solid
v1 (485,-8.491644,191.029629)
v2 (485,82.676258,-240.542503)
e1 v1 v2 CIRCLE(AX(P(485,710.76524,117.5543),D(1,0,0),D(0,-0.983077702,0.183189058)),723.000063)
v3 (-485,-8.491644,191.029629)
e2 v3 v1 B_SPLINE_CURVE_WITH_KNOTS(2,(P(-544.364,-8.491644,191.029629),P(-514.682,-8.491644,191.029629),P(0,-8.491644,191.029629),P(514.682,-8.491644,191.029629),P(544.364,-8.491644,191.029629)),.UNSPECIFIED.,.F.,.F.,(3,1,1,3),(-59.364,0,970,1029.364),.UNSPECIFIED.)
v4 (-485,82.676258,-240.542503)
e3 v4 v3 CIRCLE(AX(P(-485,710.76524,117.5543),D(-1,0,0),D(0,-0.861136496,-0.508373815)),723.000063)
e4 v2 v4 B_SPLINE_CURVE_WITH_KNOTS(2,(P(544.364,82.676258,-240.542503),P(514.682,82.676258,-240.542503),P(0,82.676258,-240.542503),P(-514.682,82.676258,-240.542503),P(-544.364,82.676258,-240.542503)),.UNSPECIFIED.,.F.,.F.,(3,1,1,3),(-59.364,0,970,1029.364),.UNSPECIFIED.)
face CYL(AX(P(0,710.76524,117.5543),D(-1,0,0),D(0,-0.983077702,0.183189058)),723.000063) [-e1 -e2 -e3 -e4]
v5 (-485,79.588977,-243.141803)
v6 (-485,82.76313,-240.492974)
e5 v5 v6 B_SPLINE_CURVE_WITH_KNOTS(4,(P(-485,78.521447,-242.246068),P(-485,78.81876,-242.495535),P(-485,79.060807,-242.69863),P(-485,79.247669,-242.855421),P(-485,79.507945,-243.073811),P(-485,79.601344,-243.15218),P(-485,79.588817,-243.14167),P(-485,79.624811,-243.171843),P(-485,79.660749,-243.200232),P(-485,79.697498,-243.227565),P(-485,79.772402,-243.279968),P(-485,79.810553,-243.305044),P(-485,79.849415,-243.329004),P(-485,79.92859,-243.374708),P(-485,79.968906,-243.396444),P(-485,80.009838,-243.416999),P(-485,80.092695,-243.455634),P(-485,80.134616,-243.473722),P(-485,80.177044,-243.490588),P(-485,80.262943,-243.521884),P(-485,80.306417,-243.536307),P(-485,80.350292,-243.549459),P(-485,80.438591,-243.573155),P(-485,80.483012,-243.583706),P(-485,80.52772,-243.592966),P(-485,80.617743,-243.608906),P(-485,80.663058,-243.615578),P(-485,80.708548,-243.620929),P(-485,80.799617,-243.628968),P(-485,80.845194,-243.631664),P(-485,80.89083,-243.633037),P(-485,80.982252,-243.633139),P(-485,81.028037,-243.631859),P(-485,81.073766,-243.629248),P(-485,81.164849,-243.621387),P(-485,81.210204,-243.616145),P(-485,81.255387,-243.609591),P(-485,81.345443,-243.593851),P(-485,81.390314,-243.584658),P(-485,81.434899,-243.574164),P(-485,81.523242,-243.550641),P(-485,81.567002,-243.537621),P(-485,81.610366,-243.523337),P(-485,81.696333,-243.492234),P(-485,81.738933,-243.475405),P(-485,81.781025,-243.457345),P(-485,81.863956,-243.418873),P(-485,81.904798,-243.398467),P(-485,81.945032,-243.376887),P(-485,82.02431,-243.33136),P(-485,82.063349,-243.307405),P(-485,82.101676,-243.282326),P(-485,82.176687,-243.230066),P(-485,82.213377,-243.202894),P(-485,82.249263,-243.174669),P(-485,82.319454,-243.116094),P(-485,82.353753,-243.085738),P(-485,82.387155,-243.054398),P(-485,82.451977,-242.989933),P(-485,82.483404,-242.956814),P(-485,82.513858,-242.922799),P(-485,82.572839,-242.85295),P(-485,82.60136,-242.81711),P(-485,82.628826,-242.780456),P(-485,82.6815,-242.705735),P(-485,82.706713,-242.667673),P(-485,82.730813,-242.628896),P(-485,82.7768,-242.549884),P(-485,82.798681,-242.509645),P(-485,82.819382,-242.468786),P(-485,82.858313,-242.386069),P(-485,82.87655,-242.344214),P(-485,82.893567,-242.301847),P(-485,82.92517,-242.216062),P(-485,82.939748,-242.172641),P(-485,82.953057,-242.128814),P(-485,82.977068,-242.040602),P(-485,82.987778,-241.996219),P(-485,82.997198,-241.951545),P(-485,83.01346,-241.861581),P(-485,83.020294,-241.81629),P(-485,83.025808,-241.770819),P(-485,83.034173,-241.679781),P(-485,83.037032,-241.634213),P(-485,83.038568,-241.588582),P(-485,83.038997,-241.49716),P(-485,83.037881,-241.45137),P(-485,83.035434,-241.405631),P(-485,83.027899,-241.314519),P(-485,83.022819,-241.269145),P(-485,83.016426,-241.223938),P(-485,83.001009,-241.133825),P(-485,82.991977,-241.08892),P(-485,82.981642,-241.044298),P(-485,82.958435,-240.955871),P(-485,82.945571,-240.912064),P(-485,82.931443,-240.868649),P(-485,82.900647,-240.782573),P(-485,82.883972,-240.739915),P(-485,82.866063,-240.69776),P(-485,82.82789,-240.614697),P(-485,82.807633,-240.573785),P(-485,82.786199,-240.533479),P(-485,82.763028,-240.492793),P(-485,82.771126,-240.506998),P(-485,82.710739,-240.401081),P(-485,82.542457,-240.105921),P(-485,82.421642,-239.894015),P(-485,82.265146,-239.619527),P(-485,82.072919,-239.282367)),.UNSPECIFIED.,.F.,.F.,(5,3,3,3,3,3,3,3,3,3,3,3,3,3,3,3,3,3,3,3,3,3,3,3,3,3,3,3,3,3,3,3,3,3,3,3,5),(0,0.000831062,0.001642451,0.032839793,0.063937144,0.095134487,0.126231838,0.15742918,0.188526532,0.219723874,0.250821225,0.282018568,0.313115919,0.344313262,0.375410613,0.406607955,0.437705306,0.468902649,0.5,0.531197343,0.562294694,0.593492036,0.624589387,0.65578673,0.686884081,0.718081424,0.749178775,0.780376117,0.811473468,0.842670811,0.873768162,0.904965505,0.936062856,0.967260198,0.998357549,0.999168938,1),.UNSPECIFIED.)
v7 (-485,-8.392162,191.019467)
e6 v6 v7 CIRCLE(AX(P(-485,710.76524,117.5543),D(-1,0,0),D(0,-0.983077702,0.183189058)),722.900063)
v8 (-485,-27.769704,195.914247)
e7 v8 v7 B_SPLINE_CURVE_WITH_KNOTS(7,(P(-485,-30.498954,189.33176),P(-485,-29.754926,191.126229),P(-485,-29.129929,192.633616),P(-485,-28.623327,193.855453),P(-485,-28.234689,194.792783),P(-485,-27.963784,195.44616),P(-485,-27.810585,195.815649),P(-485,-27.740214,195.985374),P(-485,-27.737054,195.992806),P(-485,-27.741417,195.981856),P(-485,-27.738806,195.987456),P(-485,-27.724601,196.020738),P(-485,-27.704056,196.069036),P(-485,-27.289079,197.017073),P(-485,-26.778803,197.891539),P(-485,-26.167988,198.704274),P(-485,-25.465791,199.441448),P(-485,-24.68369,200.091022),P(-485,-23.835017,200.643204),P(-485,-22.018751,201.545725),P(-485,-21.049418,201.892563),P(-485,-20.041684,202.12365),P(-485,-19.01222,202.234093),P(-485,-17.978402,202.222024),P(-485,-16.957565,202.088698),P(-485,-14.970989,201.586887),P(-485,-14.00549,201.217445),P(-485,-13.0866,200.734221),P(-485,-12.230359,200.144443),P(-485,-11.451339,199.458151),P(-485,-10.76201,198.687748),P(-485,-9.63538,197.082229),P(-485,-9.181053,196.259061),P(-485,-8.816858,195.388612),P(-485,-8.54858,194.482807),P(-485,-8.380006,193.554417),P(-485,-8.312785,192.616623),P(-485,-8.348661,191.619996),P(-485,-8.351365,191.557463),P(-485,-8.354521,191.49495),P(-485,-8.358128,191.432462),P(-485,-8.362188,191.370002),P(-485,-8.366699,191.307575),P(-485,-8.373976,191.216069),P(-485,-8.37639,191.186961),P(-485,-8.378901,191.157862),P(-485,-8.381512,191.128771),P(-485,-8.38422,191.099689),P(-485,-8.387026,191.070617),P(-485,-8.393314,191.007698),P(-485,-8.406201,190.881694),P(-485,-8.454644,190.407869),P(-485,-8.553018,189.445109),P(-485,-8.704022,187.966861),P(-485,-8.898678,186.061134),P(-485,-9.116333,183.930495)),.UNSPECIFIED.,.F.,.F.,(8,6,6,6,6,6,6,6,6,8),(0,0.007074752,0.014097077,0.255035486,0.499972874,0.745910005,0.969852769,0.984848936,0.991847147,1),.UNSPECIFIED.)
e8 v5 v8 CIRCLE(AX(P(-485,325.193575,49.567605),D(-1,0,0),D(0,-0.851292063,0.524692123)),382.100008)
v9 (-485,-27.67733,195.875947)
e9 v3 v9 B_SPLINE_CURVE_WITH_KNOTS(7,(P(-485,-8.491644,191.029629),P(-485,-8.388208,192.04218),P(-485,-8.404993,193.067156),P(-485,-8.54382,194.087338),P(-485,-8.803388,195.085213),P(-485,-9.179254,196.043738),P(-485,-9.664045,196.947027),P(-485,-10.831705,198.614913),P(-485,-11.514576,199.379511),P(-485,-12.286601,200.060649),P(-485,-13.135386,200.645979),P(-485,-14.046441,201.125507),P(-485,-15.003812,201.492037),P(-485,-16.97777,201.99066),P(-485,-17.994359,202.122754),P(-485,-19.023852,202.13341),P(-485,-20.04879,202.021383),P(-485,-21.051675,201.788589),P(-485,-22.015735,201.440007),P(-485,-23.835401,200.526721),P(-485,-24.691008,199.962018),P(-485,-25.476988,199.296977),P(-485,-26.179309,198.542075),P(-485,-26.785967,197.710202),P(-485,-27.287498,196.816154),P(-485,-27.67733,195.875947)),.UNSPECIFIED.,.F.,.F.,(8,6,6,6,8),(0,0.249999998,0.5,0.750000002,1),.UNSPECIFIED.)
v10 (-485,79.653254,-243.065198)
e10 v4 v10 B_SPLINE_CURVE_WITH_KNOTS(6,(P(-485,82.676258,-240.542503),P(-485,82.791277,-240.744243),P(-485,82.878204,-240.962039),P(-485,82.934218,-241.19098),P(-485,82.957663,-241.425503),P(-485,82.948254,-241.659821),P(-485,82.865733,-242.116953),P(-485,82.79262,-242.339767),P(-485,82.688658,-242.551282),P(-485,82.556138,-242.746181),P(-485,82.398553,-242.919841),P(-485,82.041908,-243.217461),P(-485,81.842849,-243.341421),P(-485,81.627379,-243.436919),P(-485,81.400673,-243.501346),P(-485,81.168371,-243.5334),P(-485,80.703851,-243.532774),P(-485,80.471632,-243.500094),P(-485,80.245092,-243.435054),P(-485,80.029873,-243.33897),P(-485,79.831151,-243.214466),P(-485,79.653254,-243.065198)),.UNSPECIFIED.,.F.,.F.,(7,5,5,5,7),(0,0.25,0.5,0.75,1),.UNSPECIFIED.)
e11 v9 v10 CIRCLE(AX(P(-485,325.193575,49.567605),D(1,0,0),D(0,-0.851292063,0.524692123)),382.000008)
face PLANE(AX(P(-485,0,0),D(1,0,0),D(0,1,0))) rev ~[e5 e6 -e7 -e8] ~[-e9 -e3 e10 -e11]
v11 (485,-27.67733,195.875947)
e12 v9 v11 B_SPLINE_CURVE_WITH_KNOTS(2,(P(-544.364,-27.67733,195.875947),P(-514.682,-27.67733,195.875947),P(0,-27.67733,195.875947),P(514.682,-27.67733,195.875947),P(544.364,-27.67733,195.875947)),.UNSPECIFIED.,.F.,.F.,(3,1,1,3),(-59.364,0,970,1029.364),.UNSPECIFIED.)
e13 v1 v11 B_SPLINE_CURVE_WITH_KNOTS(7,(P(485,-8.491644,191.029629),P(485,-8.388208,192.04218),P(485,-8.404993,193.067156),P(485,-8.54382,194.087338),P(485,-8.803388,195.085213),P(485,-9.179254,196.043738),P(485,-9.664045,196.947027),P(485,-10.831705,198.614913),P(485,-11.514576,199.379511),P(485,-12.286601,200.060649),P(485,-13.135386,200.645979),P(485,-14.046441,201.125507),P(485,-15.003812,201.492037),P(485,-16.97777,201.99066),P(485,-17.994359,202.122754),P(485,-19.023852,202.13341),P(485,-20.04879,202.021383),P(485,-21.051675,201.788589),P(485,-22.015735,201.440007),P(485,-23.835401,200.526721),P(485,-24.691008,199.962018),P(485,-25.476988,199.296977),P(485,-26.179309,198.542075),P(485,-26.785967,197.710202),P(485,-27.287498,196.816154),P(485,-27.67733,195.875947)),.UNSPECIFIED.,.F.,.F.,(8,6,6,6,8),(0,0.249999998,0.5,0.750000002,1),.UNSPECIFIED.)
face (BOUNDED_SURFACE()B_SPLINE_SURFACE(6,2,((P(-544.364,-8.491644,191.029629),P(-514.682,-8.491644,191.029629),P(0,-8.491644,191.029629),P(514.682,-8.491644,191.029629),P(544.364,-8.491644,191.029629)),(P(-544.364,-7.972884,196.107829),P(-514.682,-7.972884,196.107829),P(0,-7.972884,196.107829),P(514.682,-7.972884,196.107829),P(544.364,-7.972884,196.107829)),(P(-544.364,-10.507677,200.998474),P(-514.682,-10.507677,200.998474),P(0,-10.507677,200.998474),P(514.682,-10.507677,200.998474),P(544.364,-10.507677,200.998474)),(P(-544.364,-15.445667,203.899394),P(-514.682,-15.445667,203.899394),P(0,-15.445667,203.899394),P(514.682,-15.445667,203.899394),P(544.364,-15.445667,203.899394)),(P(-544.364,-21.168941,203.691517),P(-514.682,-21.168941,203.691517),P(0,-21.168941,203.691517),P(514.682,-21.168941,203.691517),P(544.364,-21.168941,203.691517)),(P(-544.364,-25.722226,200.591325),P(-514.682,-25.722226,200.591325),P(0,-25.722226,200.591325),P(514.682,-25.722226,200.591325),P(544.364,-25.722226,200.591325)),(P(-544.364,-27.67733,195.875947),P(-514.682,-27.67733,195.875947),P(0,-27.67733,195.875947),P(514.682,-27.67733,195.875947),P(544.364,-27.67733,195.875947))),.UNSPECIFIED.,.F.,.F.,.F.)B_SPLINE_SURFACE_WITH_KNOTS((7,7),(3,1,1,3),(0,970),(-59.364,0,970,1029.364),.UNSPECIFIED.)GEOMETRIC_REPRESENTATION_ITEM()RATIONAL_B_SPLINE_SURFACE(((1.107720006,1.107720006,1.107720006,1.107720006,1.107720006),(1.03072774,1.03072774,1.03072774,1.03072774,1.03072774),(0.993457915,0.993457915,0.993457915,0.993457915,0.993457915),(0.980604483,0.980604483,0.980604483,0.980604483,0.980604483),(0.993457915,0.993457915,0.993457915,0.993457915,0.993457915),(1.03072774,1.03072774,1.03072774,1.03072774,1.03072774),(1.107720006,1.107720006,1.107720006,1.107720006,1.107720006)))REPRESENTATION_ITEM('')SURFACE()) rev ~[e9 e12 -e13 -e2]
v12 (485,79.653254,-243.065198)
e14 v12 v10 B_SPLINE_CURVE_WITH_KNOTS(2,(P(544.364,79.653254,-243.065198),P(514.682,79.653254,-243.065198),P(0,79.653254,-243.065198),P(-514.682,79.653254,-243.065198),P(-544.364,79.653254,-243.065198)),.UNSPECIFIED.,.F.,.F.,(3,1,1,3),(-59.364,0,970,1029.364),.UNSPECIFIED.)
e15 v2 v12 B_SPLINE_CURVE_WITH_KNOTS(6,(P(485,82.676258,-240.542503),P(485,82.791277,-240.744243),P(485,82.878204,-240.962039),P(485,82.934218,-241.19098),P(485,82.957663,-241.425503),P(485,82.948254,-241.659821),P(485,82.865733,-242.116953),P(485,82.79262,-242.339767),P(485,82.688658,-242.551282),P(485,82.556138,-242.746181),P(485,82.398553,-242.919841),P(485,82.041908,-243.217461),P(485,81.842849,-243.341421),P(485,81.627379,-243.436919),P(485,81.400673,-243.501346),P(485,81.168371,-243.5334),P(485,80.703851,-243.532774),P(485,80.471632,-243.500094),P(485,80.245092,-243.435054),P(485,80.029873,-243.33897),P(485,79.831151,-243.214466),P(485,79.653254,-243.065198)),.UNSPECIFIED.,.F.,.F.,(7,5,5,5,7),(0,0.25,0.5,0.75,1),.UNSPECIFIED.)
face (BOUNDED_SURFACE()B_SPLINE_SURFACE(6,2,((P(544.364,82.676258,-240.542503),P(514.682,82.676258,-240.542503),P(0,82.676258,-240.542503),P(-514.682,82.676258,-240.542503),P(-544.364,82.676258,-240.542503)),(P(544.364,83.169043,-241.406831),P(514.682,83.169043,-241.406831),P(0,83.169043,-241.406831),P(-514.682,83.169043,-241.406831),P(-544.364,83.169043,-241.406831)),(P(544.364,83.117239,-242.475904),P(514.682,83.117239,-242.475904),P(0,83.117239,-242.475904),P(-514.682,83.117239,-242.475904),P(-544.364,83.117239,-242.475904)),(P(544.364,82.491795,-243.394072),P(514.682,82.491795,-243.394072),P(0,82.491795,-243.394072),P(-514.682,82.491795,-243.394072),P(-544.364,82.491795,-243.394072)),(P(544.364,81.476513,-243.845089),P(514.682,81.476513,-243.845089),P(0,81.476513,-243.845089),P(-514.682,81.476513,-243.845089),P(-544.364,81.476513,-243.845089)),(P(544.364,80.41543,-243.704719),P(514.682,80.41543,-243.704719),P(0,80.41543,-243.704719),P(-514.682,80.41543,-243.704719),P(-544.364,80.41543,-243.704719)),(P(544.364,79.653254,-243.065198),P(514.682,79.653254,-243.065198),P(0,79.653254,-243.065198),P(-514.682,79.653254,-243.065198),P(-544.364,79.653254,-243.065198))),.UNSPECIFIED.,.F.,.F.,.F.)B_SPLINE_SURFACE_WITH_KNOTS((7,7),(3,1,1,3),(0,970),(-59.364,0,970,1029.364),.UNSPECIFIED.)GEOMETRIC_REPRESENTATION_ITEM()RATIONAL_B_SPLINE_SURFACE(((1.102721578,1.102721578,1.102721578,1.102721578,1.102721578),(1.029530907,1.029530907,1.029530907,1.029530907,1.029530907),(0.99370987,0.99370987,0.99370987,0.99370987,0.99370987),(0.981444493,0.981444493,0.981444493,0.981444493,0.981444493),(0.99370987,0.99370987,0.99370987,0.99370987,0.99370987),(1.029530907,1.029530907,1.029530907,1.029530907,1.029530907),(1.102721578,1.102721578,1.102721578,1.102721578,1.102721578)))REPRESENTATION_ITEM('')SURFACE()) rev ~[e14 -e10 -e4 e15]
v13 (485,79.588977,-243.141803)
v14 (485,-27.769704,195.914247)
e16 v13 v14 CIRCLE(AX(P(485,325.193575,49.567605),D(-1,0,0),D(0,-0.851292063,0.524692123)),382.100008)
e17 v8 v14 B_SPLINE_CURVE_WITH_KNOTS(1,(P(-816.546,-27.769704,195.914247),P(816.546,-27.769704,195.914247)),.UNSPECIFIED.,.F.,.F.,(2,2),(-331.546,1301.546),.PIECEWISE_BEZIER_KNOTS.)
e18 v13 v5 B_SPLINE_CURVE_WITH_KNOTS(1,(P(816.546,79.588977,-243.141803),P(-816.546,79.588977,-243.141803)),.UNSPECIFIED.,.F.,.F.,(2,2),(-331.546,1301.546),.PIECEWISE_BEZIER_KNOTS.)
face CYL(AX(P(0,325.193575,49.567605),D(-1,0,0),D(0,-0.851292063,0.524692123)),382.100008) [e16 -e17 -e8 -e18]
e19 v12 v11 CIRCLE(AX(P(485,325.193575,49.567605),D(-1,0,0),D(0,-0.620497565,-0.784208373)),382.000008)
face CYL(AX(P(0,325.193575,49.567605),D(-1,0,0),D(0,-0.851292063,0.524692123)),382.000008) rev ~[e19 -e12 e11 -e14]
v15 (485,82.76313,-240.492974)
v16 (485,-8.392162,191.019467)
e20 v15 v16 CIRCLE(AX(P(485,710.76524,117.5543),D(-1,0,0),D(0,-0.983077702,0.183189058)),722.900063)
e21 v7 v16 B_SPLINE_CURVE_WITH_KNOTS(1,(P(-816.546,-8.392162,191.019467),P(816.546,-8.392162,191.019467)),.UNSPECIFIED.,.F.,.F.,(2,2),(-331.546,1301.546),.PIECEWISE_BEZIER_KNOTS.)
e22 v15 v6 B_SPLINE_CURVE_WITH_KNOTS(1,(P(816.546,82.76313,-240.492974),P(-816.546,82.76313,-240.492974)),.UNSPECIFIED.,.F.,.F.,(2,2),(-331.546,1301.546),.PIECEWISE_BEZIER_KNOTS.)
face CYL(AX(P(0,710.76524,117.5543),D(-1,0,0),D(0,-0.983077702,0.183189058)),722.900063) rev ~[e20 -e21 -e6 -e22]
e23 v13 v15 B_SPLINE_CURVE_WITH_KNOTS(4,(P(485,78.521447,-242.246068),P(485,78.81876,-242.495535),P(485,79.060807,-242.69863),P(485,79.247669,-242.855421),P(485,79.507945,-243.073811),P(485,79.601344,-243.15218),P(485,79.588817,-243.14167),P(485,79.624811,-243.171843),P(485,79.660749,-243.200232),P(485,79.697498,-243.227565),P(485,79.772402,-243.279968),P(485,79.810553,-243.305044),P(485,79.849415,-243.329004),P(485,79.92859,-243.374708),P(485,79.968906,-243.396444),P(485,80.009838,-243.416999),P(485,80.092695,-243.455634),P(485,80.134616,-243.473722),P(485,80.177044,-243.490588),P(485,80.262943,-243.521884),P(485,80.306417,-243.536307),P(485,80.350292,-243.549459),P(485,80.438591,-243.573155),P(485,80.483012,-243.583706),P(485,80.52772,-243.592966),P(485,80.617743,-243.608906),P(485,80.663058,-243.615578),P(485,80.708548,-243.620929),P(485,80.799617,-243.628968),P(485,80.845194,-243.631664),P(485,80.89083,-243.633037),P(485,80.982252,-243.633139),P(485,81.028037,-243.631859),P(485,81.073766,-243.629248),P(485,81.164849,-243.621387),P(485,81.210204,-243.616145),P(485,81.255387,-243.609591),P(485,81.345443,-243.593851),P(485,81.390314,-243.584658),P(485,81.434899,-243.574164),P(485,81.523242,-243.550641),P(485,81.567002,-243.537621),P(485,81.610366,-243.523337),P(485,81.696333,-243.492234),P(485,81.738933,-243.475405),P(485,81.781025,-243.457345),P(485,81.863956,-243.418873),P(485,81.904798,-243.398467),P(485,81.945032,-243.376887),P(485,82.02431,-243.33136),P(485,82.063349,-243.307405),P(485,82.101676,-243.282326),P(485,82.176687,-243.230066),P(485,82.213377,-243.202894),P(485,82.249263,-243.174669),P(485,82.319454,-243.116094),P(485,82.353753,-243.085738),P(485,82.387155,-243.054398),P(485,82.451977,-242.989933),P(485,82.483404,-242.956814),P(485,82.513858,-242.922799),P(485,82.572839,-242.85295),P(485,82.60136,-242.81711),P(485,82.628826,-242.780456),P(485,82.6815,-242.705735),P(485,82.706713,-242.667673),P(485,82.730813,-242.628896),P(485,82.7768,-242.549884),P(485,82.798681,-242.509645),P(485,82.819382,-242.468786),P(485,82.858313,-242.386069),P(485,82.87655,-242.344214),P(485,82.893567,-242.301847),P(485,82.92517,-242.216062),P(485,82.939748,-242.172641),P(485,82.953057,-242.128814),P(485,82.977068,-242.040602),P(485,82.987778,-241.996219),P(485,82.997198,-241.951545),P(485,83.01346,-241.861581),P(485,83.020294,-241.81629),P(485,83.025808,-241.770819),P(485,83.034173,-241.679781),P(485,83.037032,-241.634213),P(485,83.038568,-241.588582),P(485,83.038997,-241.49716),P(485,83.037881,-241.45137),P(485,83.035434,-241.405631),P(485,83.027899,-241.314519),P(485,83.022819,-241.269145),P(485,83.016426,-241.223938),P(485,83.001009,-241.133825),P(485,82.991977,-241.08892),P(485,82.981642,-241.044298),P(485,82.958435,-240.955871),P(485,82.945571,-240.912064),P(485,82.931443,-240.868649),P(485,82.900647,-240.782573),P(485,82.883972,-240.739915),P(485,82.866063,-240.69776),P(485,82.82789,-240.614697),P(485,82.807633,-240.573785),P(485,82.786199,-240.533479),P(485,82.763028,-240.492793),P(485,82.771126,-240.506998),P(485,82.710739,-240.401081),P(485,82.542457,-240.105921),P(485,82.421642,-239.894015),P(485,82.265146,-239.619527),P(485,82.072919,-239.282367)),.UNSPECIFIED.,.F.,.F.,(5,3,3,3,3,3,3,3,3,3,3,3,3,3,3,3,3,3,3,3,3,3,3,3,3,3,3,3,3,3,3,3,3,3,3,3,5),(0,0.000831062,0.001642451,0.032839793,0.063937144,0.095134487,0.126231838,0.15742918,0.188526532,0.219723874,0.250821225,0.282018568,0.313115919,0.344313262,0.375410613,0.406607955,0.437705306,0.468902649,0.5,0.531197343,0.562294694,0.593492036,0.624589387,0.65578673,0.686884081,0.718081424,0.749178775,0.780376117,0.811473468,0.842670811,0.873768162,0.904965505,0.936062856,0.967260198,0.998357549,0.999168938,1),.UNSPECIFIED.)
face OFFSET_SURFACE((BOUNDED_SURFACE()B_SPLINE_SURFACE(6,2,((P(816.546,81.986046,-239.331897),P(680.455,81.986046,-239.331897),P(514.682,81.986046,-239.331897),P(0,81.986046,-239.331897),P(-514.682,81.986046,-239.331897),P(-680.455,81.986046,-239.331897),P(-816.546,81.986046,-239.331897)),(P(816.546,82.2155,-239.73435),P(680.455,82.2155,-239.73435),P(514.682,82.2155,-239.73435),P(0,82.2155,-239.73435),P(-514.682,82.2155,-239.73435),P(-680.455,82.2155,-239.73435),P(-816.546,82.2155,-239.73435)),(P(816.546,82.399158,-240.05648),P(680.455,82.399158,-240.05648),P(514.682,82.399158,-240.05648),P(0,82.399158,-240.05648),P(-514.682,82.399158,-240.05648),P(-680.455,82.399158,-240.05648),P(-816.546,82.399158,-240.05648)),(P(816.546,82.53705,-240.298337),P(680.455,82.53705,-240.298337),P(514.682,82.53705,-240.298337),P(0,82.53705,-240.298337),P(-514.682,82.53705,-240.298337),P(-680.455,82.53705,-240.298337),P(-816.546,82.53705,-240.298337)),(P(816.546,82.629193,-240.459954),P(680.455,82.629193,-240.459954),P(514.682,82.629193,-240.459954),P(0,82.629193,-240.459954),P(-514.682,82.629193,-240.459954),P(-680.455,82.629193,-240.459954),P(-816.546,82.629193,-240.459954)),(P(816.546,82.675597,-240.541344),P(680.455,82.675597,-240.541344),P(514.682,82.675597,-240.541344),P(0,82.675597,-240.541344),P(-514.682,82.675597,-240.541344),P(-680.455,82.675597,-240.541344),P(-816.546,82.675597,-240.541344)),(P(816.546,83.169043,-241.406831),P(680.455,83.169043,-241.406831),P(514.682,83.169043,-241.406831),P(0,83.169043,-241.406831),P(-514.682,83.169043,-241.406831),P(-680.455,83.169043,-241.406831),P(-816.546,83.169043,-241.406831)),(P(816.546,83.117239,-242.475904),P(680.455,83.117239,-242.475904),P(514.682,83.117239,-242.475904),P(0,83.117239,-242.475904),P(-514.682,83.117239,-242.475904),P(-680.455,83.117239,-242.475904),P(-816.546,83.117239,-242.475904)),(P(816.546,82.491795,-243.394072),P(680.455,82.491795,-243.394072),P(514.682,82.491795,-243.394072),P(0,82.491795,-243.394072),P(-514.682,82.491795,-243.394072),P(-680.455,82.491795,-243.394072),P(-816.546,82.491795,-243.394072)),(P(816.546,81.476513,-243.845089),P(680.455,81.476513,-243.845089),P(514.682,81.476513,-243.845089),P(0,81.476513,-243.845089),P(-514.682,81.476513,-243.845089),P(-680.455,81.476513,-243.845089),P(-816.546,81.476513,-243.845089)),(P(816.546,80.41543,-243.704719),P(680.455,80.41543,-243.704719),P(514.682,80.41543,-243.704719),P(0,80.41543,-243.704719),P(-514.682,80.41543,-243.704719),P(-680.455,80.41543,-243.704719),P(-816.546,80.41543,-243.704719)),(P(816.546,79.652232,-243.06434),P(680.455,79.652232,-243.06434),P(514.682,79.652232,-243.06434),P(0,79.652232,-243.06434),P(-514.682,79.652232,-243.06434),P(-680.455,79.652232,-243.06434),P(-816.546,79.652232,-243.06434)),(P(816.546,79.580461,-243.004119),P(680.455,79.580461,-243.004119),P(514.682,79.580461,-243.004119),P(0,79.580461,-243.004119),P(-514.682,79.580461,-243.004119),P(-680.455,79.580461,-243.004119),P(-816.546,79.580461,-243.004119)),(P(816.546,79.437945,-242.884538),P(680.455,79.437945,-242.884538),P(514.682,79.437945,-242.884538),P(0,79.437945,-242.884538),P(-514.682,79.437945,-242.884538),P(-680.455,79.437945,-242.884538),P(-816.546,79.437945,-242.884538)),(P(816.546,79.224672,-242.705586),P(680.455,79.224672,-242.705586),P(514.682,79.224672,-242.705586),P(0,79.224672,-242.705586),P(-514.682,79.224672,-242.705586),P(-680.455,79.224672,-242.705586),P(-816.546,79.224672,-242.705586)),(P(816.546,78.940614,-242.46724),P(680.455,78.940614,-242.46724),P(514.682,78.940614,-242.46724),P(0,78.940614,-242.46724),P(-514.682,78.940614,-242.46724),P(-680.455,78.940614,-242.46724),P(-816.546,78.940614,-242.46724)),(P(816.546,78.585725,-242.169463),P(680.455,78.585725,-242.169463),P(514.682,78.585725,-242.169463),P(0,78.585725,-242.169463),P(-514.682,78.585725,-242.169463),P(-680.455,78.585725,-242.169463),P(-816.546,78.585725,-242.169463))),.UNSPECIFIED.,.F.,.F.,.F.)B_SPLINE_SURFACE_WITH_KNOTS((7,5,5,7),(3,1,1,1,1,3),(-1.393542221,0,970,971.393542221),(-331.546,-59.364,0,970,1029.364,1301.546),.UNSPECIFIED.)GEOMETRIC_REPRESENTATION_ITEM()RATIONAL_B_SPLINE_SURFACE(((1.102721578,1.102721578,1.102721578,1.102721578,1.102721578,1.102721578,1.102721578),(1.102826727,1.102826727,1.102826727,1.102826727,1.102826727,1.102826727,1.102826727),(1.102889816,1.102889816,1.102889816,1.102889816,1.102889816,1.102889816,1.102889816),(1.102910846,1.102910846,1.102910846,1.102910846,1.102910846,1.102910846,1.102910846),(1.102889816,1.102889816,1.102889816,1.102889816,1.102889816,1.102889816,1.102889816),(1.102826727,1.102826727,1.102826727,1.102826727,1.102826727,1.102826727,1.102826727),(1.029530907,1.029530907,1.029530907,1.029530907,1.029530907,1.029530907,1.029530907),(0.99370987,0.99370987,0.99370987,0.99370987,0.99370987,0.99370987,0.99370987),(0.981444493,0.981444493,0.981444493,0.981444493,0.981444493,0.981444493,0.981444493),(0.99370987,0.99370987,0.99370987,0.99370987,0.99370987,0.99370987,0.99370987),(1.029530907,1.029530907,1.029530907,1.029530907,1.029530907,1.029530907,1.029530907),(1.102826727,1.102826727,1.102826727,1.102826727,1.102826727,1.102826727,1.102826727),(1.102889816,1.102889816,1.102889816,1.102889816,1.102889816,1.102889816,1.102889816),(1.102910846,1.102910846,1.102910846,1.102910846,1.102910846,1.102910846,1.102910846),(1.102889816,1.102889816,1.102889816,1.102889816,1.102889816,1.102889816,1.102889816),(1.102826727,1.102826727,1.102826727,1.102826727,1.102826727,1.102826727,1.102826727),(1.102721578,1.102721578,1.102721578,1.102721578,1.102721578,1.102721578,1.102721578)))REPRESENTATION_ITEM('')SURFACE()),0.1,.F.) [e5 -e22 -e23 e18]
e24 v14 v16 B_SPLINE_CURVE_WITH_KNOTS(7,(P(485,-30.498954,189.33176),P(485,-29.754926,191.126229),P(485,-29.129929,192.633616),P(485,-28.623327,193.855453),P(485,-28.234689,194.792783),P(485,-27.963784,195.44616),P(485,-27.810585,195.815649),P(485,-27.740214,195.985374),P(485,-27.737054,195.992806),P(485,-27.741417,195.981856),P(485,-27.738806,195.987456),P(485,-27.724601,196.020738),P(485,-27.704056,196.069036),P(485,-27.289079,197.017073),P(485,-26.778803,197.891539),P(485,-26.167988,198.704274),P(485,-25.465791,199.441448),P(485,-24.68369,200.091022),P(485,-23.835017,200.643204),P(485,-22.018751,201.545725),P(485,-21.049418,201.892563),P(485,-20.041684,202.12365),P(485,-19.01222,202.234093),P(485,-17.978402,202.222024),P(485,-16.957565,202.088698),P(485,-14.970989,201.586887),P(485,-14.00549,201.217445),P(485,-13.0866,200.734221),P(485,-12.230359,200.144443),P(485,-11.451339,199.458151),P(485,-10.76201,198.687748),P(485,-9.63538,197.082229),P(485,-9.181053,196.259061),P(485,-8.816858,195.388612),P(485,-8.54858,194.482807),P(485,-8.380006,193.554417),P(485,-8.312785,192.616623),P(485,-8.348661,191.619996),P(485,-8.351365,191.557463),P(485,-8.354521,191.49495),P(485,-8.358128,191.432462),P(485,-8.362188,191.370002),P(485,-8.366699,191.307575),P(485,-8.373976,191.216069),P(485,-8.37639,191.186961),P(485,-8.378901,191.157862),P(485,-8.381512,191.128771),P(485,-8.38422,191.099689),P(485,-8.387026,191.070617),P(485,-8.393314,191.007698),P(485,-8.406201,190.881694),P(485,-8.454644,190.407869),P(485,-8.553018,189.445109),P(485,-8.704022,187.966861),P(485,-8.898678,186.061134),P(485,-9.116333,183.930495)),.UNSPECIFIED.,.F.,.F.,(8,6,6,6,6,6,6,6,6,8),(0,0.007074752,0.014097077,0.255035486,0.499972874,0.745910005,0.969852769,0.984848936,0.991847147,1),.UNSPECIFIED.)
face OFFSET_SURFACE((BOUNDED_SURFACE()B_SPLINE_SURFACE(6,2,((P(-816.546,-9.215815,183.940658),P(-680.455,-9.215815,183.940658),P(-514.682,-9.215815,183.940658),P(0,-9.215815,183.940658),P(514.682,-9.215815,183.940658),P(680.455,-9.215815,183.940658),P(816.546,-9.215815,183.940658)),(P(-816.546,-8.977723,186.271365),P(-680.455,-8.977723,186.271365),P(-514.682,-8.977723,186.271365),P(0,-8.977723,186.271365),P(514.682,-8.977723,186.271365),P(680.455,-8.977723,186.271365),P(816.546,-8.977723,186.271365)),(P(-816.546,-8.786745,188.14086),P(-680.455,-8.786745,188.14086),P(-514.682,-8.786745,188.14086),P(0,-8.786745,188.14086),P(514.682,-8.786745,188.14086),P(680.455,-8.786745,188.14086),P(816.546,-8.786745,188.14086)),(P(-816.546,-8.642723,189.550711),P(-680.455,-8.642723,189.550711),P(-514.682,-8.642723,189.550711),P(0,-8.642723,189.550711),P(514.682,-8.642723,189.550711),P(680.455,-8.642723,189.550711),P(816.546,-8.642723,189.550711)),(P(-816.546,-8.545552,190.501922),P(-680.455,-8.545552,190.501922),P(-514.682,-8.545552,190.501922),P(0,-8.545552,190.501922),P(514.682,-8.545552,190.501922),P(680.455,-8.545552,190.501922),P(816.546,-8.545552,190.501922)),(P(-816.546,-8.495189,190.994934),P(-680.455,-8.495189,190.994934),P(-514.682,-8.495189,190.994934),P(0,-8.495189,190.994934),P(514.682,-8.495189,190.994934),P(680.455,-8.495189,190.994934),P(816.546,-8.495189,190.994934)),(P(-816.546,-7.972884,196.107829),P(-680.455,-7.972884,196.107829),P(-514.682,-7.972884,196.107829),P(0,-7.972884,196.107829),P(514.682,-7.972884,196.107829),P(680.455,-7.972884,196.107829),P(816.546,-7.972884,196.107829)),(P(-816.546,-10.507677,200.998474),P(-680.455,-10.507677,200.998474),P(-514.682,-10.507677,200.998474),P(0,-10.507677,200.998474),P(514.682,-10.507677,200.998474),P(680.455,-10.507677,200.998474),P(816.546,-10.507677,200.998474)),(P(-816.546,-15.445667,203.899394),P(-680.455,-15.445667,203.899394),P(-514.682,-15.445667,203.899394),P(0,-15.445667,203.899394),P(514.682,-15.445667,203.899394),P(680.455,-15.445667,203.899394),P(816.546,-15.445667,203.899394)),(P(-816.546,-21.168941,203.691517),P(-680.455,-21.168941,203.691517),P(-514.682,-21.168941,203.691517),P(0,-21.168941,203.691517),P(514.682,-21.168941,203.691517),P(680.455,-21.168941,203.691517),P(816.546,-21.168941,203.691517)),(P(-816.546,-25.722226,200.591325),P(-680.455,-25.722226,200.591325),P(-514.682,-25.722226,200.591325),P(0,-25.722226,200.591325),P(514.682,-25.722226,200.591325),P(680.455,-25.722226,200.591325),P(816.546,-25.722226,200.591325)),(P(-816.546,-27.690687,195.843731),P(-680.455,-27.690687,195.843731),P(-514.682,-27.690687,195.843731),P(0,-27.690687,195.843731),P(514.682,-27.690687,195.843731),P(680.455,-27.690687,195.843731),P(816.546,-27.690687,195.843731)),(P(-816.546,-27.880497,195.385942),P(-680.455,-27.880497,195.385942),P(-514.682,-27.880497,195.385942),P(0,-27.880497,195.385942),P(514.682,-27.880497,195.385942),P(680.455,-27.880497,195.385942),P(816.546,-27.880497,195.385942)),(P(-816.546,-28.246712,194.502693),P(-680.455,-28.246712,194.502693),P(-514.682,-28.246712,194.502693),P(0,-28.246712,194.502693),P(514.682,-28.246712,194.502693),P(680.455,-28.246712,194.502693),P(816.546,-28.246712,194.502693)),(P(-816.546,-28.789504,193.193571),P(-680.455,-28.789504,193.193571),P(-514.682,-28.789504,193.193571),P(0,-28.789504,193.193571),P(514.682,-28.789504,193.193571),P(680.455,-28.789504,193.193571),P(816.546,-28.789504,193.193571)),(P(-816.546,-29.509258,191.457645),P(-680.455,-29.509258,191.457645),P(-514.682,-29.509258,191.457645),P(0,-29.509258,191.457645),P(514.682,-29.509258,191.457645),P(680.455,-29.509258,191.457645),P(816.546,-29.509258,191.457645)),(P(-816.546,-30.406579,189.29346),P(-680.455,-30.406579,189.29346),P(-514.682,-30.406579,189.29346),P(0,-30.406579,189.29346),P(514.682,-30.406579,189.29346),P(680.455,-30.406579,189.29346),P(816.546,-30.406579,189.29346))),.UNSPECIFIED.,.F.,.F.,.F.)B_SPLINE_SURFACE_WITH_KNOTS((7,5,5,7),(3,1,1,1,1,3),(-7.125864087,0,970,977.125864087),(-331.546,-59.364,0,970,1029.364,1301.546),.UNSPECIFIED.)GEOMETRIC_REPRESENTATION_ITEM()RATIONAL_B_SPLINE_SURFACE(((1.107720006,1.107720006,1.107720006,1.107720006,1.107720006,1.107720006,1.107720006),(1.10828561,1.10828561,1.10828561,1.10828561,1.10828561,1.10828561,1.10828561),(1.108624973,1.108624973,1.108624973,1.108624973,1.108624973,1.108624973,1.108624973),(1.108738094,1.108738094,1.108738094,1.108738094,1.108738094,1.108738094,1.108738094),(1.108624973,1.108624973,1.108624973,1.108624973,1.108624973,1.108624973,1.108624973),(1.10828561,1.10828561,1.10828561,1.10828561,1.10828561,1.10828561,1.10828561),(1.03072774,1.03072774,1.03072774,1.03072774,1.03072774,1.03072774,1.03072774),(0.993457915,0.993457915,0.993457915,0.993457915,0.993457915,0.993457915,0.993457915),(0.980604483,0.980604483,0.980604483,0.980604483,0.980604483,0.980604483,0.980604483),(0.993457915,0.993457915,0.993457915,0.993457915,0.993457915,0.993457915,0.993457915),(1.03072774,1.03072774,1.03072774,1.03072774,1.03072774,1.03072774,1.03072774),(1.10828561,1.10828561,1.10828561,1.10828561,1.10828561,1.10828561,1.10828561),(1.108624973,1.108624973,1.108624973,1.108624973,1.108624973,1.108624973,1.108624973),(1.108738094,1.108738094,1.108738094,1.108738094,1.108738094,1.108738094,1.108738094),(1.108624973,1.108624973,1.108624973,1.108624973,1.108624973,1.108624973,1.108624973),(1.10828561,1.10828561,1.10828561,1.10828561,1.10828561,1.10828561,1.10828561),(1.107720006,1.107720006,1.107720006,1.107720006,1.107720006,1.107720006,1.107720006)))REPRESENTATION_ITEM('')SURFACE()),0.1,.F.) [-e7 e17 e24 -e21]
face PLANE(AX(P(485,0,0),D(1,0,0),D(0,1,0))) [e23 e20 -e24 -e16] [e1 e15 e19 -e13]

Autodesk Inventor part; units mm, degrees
ref_plane "YZ Plane" through (0, 0, 0) normal (1, 0, 0) x (0, 1, 0)
ref_plane "XZ Plane" through (0, 0, 0) normal (0, 1, 0) x (-1, 0, 0)
ref_plane "XY Plane" through (0, 0, 0) normal (0, 0, 1) x (1, 0, 0)
sketch "スケッチ1" plane through (0, 0, 0) normal (1, 0, 0) x (0, 1, 0)
  line L0 (0, 250) -> (88.1635, -250)
  arc A0 (0, 250) -> (88.1635, -250) centre (710.7652, 117.5543) ccw
  arc A1 (0, 250) -> (88.1635, -250) centre (325.1936, 49.5676) ccw
  line L1 (0, -370.1192) -> (0, 353.3532) projected
  point P0 (0, 0)
  dimension "d0" = 250
  dimension "d2" = 500
  dimension "d3" = 10
  dimension "d4" = 723
  dimension "d5" = 382
extrude "押し出し1" add sketch "スケッチ1" along normal mid plane 970 contours A0 L1 A1 | A1 L1 A0
fillet "フィレット1" radius 10 1 edges at (0, 0, 250)
fillet "フィレット2" radius 2 1 edges at (0, 88.1635, -250)
shell "シェル1" thickness 0.1 outward yes removed faces 2 at (485, -17.1174, -13.9662) at (-485, -17.1174, -13.9662)
properties part number "cover" material "CFRP"
